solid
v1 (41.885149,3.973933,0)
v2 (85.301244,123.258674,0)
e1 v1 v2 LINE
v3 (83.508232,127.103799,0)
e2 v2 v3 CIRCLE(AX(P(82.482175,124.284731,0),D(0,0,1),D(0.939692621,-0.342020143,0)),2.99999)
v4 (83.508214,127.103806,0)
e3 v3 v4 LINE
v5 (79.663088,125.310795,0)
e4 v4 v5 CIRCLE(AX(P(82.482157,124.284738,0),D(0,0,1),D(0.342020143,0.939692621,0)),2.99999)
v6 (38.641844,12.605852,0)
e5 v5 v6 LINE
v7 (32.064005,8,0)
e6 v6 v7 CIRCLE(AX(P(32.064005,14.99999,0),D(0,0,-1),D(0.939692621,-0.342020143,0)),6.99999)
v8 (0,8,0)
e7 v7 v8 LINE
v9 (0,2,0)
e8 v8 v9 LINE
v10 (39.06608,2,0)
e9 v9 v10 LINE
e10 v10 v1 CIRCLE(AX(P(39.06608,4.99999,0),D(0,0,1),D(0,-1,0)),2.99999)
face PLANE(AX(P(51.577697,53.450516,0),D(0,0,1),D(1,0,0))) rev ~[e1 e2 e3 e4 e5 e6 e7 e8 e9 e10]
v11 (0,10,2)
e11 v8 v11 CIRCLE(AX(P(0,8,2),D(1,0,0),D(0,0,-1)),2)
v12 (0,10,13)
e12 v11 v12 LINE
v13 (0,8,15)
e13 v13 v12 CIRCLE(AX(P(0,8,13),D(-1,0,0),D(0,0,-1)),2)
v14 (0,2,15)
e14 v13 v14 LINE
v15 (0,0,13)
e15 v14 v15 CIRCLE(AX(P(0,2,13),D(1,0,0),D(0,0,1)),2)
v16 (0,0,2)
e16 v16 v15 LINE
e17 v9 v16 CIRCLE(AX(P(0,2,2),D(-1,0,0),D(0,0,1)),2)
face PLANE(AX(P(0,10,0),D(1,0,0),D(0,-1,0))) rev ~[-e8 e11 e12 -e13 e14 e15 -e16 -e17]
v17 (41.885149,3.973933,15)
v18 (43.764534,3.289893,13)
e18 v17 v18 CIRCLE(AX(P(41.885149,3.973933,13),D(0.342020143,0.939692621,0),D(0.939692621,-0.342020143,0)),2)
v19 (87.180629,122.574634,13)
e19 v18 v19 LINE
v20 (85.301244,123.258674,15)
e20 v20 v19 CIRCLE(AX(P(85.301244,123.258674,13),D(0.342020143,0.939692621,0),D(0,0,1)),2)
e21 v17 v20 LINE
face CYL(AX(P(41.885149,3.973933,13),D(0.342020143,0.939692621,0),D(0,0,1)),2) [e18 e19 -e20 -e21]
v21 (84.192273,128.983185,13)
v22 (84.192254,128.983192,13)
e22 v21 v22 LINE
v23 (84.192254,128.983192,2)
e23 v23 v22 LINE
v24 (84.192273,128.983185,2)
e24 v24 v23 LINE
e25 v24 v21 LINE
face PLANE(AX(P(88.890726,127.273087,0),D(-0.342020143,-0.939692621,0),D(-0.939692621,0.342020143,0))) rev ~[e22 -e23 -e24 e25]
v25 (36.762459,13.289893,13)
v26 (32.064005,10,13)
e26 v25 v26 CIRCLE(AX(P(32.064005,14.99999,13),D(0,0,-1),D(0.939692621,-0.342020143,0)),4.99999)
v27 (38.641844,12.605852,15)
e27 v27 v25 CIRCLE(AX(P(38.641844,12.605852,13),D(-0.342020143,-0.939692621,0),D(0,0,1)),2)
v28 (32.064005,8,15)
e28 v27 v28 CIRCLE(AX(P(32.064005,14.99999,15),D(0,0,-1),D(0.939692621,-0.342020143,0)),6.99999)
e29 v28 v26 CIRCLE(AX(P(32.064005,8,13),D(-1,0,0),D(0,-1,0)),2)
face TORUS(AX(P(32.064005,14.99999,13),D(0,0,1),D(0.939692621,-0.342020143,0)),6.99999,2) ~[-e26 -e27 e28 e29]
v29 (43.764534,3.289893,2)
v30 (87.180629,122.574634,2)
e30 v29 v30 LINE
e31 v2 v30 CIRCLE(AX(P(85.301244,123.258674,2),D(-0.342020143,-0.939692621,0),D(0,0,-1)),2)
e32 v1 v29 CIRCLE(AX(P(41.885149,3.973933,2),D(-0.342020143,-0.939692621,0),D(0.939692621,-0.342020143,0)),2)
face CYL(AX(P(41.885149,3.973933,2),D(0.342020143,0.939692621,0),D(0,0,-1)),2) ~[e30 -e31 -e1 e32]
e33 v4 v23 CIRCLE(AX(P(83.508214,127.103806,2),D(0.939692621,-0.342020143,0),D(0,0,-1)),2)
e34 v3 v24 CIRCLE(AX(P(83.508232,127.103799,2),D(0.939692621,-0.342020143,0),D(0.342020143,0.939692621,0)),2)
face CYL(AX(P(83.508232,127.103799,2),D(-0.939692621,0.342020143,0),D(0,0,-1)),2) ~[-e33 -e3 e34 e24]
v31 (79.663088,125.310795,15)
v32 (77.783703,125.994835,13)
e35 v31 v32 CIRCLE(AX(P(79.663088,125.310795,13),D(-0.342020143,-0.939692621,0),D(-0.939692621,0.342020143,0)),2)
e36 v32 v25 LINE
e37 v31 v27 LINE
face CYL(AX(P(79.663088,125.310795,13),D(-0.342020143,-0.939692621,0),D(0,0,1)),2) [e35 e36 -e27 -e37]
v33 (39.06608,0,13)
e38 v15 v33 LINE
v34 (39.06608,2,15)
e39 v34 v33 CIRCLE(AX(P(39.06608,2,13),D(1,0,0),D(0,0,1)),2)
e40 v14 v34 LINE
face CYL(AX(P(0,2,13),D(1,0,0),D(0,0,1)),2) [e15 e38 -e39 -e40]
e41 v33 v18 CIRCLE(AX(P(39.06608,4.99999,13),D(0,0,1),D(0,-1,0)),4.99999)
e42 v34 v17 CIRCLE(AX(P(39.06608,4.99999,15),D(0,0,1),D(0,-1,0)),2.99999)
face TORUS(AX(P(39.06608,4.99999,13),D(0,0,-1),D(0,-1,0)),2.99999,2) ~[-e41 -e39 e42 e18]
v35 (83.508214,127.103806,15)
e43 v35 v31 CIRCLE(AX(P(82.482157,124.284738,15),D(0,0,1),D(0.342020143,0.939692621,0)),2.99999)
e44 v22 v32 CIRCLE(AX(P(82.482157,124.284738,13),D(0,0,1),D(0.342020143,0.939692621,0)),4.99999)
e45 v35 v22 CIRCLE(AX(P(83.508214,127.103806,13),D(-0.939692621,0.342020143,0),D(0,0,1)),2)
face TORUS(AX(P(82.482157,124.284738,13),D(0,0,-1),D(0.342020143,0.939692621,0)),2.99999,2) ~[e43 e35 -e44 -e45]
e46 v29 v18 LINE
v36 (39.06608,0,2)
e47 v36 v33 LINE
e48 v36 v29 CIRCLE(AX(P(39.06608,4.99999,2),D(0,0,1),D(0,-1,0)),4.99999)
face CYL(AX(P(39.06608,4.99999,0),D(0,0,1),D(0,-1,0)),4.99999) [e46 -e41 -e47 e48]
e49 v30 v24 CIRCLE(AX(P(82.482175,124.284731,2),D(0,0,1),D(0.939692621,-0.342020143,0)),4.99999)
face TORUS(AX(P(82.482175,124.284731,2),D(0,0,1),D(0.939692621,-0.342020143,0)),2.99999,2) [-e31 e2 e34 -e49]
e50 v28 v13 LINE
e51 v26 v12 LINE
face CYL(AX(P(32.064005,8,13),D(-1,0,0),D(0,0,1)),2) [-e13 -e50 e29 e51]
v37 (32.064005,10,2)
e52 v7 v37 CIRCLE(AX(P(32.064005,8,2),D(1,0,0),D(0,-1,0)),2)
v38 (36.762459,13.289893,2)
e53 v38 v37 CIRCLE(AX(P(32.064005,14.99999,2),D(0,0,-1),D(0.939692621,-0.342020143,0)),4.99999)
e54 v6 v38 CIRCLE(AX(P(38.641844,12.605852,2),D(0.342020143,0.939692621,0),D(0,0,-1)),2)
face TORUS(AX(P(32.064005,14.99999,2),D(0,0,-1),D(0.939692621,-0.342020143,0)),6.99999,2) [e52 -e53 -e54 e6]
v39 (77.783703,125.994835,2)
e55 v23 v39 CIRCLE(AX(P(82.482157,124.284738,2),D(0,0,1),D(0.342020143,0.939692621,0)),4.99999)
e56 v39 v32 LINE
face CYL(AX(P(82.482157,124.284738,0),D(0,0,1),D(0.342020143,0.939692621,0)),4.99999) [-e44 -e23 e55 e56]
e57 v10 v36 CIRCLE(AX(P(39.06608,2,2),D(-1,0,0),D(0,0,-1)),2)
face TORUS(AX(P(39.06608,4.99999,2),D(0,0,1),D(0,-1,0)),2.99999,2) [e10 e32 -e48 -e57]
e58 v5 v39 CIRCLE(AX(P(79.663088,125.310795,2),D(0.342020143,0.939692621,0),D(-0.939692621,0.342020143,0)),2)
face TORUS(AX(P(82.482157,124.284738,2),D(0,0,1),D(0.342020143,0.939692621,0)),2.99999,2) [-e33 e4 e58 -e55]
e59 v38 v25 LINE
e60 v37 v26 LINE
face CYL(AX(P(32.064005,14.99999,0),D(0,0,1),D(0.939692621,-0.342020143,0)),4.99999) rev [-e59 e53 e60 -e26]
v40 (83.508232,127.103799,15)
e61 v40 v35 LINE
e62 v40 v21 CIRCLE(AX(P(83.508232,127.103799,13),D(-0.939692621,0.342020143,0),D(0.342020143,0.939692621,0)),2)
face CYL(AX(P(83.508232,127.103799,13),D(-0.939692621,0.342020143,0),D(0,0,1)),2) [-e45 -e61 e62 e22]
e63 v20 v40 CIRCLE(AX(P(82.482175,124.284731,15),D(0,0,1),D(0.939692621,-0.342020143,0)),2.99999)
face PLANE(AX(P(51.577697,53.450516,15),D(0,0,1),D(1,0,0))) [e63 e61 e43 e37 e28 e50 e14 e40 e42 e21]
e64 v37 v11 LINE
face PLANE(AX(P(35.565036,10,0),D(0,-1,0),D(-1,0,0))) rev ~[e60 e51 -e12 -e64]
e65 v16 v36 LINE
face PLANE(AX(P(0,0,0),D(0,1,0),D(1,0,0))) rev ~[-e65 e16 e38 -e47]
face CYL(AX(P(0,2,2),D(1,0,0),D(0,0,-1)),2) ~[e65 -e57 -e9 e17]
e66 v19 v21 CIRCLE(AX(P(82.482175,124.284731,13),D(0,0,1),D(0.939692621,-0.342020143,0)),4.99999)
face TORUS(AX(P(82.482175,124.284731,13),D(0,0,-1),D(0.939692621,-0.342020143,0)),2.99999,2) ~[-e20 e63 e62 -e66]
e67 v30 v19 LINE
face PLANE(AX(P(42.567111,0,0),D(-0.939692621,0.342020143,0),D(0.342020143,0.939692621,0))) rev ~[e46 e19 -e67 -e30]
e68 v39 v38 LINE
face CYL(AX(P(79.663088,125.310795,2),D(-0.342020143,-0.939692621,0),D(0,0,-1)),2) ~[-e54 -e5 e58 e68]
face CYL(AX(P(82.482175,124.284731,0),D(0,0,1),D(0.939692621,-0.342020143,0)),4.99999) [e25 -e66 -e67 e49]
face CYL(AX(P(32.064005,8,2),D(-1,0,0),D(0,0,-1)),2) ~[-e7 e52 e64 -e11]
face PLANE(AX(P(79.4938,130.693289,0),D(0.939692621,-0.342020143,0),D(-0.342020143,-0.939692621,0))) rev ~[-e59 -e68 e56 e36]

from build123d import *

# Parameters (mm, degrees)
F1_DEPTH = 15
F2_R     = 4.99999
F3_R     = 2


# Not quite as in the source:
# - a fillet or chamfer is up to 0.001 mm smaller than in the source, because OpenCascade refuses the exact size


with BuildPart() as f1:
    # F0 (on Top) → F1 (new body)
    with BuildSketch(Plane.XY):
        Polygon((0, 10), (0, 0), (42.567110899, 0), (88.8907263303, 127.2730873849), (79.4938001224, 130.6932888181), (35.5650355169, 10), align=None)
    extrude(amount=F1_DEPTH)

    # F2 (radius 5 in the source; OpenCascade refuses exactly that, so slightly less here)
    f2_edges = [f1.edges().sort_by_distance(p)[0] for p in [
        (35.565036, 10, 7.5),
        (42.567111, 0, 7.5),
        (79.4938, 130.693289, 7.5),
        (88.890726, 127.273087, 7.5),
    ]]
    fillet(f2_edges, radius=F2_R)

    # F3
    f3_edges = [f1.edges().sort_by_distance(p)[0] for p in [
        (57.273081, 69.642364, 15),
        (57.273081, 69.642364, 0),
    ]]
    fillet(f3_edges, radius=F3_R)


solid = f1.part
